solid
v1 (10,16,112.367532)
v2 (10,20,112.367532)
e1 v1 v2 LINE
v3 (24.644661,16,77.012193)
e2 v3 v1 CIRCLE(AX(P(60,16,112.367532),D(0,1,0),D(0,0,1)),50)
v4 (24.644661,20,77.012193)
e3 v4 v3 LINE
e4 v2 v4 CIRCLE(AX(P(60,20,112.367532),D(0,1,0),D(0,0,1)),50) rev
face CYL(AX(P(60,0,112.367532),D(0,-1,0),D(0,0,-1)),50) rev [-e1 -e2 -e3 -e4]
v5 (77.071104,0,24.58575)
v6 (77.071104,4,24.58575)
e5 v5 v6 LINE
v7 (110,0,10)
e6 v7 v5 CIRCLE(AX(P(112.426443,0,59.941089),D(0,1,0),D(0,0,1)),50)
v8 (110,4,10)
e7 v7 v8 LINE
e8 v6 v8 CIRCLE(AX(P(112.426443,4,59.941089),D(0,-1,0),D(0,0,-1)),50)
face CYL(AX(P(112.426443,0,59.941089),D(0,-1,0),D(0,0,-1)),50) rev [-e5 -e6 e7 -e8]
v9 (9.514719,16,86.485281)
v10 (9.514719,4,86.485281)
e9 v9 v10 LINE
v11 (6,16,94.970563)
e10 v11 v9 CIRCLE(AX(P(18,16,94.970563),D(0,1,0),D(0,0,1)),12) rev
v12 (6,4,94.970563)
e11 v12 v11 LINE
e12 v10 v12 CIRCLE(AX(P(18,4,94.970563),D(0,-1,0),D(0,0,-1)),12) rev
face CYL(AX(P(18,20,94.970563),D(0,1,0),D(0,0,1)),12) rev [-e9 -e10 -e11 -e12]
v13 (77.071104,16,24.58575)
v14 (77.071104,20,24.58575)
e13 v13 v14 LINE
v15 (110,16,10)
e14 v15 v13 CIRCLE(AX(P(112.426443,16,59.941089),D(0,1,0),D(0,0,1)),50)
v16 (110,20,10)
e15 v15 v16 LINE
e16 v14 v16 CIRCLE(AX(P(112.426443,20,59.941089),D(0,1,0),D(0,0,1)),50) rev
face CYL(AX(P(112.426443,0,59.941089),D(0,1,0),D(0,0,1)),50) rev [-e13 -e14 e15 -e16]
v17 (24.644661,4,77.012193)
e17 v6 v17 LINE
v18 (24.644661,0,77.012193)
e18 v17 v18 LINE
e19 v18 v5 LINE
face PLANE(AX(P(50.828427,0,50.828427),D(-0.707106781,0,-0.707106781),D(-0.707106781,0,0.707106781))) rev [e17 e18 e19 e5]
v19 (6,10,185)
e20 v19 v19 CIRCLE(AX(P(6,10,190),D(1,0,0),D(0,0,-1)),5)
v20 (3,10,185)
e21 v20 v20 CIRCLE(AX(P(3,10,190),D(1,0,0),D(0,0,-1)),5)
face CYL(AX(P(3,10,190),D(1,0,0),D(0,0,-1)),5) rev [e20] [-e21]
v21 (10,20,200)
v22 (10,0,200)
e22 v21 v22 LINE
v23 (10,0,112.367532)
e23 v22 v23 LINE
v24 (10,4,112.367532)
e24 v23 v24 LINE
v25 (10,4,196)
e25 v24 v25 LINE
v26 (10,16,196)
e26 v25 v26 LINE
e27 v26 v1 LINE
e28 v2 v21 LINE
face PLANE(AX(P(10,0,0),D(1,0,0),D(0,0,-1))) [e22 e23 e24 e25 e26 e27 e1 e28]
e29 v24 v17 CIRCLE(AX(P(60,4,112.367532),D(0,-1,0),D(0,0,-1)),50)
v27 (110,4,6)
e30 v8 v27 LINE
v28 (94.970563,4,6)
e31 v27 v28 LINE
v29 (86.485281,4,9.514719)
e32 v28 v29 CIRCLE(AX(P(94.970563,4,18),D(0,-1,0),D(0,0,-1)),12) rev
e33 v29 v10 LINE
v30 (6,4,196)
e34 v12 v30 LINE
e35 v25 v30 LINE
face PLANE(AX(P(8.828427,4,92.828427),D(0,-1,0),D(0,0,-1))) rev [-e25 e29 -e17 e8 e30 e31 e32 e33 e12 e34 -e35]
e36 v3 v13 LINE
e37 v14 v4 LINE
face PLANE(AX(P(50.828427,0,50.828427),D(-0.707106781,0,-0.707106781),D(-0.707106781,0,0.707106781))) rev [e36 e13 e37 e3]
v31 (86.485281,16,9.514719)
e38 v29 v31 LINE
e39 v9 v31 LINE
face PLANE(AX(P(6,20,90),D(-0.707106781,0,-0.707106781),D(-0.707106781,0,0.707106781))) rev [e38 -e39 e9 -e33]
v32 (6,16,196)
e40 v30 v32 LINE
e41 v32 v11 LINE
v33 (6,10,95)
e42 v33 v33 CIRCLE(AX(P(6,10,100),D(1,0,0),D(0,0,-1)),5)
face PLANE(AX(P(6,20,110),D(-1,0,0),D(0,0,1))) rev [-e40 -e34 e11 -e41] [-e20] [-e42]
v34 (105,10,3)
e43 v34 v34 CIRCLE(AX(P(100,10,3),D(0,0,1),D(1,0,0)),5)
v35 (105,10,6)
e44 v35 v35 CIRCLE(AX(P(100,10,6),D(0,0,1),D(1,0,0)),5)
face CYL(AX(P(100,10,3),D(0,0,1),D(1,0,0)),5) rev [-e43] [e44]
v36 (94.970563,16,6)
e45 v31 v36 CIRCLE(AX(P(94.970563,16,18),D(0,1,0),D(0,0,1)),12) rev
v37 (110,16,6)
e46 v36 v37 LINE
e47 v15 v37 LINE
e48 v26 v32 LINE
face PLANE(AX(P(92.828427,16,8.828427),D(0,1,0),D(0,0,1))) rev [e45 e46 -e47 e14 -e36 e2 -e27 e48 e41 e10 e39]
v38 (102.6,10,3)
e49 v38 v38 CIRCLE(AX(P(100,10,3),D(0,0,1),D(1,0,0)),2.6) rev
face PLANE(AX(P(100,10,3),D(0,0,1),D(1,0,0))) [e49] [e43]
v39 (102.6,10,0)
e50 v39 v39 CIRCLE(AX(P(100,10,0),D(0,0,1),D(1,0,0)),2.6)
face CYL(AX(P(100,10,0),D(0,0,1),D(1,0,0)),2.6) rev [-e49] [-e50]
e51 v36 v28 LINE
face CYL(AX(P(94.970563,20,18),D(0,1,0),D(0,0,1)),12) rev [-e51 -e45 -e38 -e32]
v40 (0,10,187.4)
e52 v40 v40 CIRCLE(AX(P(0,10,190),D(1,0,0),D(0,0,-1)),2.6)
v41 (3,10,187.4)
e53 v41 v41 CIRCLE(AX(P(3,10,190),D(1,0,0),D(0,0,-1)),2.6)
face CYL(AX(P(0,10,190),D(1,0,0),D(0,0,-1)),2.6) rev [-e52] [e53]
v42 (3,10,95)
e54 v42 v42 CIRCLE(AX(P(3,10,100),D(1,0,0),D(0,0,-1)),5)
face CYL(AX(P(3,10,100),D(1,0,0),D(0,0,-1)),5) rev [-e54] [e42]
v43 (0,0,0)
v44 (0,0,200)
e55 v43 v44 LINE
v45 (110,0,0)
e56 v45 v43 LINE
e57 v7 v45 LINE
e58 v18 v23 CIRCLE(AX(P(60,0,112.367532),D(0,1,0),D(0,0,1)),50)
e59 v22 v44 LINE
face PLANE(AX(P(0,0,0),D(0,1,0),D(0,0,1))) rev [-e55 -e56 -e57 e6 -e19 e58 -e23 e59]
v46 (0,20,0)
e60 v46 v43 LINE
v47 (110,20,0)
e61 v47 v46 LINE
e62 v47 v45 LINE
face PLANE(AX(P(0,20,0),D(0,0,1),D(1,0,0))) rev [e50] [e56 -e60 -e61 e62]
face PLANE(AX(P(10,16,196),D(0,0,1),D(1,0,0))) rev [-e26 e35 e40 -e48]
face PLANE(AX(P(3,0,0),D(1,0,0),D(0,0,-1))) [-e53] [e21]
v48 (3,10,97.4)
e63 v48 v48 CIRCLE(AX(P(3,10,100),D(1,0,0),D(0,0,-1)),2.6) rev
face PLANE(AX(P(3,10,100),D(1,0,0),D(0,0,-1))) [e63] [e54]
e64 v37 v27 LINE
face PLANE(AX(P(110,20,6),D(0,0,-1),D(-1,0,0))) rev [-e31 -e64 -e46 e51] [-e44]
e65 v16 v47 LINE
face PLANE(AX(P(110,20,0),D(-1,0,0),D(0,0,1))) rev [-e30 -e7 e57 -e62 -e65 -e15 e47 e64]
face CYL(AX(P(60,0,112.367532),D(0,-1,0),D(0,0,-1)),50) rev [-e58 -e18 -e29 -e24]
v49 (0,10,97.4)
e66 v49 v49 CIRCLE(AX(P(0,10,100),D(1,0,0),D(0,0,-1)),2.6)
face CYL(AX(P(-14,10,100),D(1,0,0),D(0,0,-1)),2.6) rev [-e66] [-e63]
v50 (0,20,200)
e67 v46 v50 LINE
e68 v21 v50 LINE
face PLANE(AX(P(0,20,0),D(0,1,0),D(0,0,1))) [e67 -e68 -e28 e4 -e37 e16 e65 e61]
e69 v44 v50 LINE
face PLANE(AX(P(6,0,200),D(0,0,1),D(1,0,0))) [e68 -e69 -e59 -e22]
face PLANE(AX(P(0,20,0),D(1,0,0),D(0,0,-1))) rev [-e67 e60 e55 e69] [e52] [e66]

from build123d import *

# Parameters (mm, degrees)
EXTRUDE_1_DEPTH     = 20
CUT_EXTRUDE_1_DEPTH = 20
SKETCH_3_R          = 5
CUT_EXTRUDE_2_DEPTH = 3
CUT_EXTRUDE_3_DEPTH = 6
SKETCH_5_R          = 5
CUT_EXTRUDE_4_DEPTH = 3
SKETCH_6_W          = 90
SKETCH_6_H          = 20
EXTRUDE_2_DEPTH     = 6
SKETCH_7_R          = 5
CUT_EXTRUDE_5_DEPTH = 3
SKETCH_8_R          = 2.6
CUT_EXTRUDE_6_DEPTH = 3
SKETCH_11_W         = 118.79393924
SKETCH_11_H         = 4
EXTRUDE_4_DEPTH     = 4
SKETCH_12_W         = 110
SKETCH_12_H         = 4
EXTRUDE_5_DEPTH     = 4
SKETCH_13_W         = 20
SKETCH_13_H         = 4
EXTRUDE_6_DEPTH     = 4
FILLET_2_R          = 12
FILLET_3_R          = 50
SKETCH_14_W         = 4
SKETCH_14_H         = 12
EXTRUDE_7_DEPTH     = 4


with BuildPart() as part:
    # 草图1 → 凸台-拉伸1 (new body)
    with BuildSketch(Plane(origin=(0, 0, 0), x_dir=(1, 0, 0), z_dir=(0, 1, 0))):
        Polygon((0, 0), (110, 0), (110, -6), (90, -6), (6, -90), (6, -110), (0, -110), align=None)
    extrude(amount=EXTRUDE_1_DEPTH)

    # 草图2 → 切除-拉伸1 (cut)
    with BuildSketch(Plane(origin=(6, 0, 0), x_dir=(0, 0, -1), z_dir=(1, 0, 0))):
        with BuildLine():
            ThreePointArc((-97.4, 10), (-99.005023076, 12.402086785), (-101.838477631, 11.838477631))
            Line((-101.838477631, 11.838477631), (-98.161522369, 8.161522369))
            ThreePointArc((-98.161522369, 8.161522369), (-97.597913215, 9.005023076), (-97.4, 10))
        make_face()
        with BuildLine():
            Line((-98.161522369, 8.161522369), (-101.838477631, 11.838477631))
            ThreePointArc((-101.838477631, 11.838477631), (-101.838477631, 8.161522369), (-98.161522369, 8.161522369))
        make_face()
    extrude(amount=-CUT_EXTRUDE_1_DEPTH, mode=Mode.SUBTRACT)

    # 草图3 → 切除-拉伸2 (cut)
    with BuildSketch(Plane(origin=(6, 0, 0), x_dir=(0, 0, -1), z_dir=(1, 0, 0))):
        with Locations((-100, 10)):
            Circle(SKETCH_3_R)
    extrude(amount=-CUT_EXTRUDE_2_DEPTH, mode=Mode.SUBTRACT)

    # 草图4 → 切除-拉伸3 (cut)
    with BuildSketch(Plane.XY.offset(6)):
        with BuildLine():
            ThreePointArc((102.6, 10), (100.994976924, 12.402086785), (98.161522369, 11.838477631))
            Line((98.161522369, 11.838477631), (101.838477631, 8.161522369))
            ThreePointArc((101.838477631, 8.161522369), (102.402086785, 9.005023076), (102.6, 10))
        make_face()
        with BuildLine():
            Line((101.838477631, 8.161522369), (98.161522369, 11.838477631))
            ThreePointArc((98.161522369, 11.838477631), (98.161522369, 8.161522369), (101.838477631, 8.161522369))
        make_face()
    extrude(amount=-CUT_EXTRUDE_3_DEPTH, mode=Mode.SUBTRACT)

    # 草图5 → 切除-拉伸4 (cut)
    with BuildSketch(Plane.XY.offset(6)):
        with Locations((100, 10)):
            Circle(SKETCH_5_R)
    extrude(amount=-CUT_EXTRUDE_4_DEPTH, mode=Mode.SUBTRACT)

    # 草图6 → 凸台-拉伸2 (add)
    with BuildSketch(Plane.ZY):
        with Locations((155, 10)):
            Rectangle(SKETCH_6_W, SKETCH_6_H)
    extrude(amount=-EXTRUDE_2_DEPTH)

    # 草图7 → 切除-拉伸5 (cut)
    with BuildSketch(Plane(origin=(6, 0, 0), x_dir=(0, 0, -1), z_dir=(1, 0, 0))):
        with Locations((-190, 10)):
            Circle(SKETCH_7_R)
    extrude(amount=-CUT_EXTRUDE_5_DEPTH, mode=Mode.SUBTRACT)

    # 草图8 → 切除-拉伸6 (cut)
    with BuildSketch(Plane(origin=(3, 0, 0), x_dir=(0, 0, -1), z_dir=(1, 0, 0))):
        with Locations((-190, 10)):
            Circle(SKETCH_8_R)
    extrude(amount=-CUT_EXTRUDE_6_DEPTH, mode=Mode.SUBTRACT)

    # 草图11 → 凸台-拉伸4 (add)
    with BuildSketch(Plane(origin=(48, 0, 48), x_dir=(0.7071067811865475, 0, -0.7071067811865476), z_dir=(0.7071067811865476, 0, 0.7071067811865475))):
        with Locations((0, 18)):
            Rectangle(SKETCH_11_W, SKETCH_11_H)
        with Locations((0, 2)):
            Rectangle(SKETCH_11_W, SKETCH_11_H)
    extrude(amount=EXTRUDE_4_DEPTH)

    # 草图12 → 凸台-拉伸5 (add)
    with BuildSketch(Plane(origin=(6, 0, 0), x_dir=(0, 0, -1), z_dir=(1, 0, 0))):
        with Locations((-145, 18)):
            Rectangle(SKETCH_12_W, SKETCH_12_H)
        with Locations((-145, 2)):
            Rectangle(SKETCH_12_W, SKETCH_12_H)
    extrude(amount=EXTRUDE_5_DEPTH)

    # 草图13 → 凸台-拉伸6 (add)
    with BuildSketch(Plane.XY.offset(6)):
        with Locations((100, 18)):
            Rectangle(SKETCH_13_W, SKETCH_13_H)
        with Locations((100, 2)):
            Rectangle(SKETCH_13_W, SKETCH_13_H)
    extrude(amount=EXTRUDE_6_DEPTH)

    # 圆角2
    fillet_2_edges = [part.edges().sort_by_distance(p)[0] for p in [
        (90, 10, 6),
        (6, 10, 90),
    ]]
    fillet(fillet_2_edges, radius=FILLET_2_R)

    # 圆角3
    # the kernel refuses this fillet: 50 mm, written as the material it adds along each edge
    with BuildSketch(Plane(origin=(10, 0, 91.656854249), x_dir=(0, 0, 1), z_dir=(0, 1, 0))) as fillet_3_piece_1:
        with BuildLine():
            CenterArc((FILLET_3_R * 0.414213562373, FILLET_3_R), FILLET_3_R, 225, 45)
            Line((-FILLET_3_R * 0.292893218813, FILLET_3_R * 0.292893218813), (-FILLET_3_R * 0.307035354437, FILLET_3_R * 0.27875108319))
            Line((-FILLET_3_R * 0.307035354437, FILLET_3_R * 0.27875108319), (-FILLET_3_R * 0.00828427124746, -FILLET_3_R * 0.02))
            Line((-FILLET_3_R * 0.00828427124746, -FILLET_3_R * 0.02), (FILLET_3_R * 0.414213562373, -FILLET_3_R * 0.02))
            Line((FILLET_3_R * 0.414213562373, -FILLET_3_R * 0.02), (FILLET_3_R * 0.414213562373, 0))
        make_face()
    extrude(amount=4)
    with BuildSketch(Plane(origin=(10, 0, 91.656854249), x_dir=(0, 0, 1), z_dir=(0, 1, 0))) as fillet_3_piece_2_section:
        with BuildLine():
            CenterArc((FILLET_3_R * 0.414213562373, FILLET_3_R), FILLET_3_R, 225, 45)
            Line((-FILLET_3_R * 0.292893218813, FILLET_3_R * 0.292893218813), (-FILLET_3_R * 0.307035354437, FILLET_3_R * 0.27875108319))
            Line((-FILLET_3_R * 0.307035354437, FILLET_3_R * 0.27875108319), (-FILLET_3_R * 0.00828427124746, -FILLET_3_R * 0.02))
            Line((-FILLET_3_R * 0.00828427124746, -FILLET_3_R * 0.02), (FILLET_3_R * 0.414213562373, -FILLET_3_R * 0.02))
            Line((FILLET_3_R * 0.414213562373, -FILLET_3_R * 0.02), (FILLET_3_R * 0.414213562373, 0))
        make_face()
    fillet_3_piece_2 = extrude(amount=55.776695297, mode=Mode.PRIVATE)
    fillet_3_piece_2 = split(fillet_3_piece_2, bisect_by=Plane(origin=(13.090507107, 16, 92.936984208), z_dir=(0, 1, 0)), keep=Keep.TOP, mode=Mode.PRIVATE)
    fillet_3_piece_2 = split(fillet_3_piece_2, bisect_by=Plane(origin=(13.090507107, 20, 92.936984208), z_dir=(0, -1, 0)), keep=Keep.TOP, mode=Mode.PRIVATE)
    add(fillet_3_piece_2)
    with BuildSketch(Plane(origin=(10, 20, 91.656854249), x_dir=(0, 0, 1), z_dir=(0, -1, 0))) as fillet_3_piece_3:
        with BuildLine():
            CenterArc((FILLET_3_R * 0.414213562373, -FILLET_3_R), FILLET_3_R, 90, 45)
            Line((-FILLET_3_R * 0.292893218813, -FILLET_3_R * 0.292893218813), (-FILLET_3_R * 0.307035354437, -FILLET_3_R * 0.27875108319))
            Line((-FILLET_3_R * 0.307035354437, -FILLET_3_R * 0.27875108319), (-FILLET_3_R * 0.00828427124746, FILLET_3_R * 0.02))
            Line((-FILLET_3_R * 0.00828427124746, FILLET_3_R * 0.02), (FILLET_3_R * 0.414213562373, FILLET_3_R * 0.02))
            Line((FILLET_3_R * 0.414213562373, FILLET_3_R * 0.02), (FILLET_3_R * 0.414213562373, 0))
        make_face()
    extrude(amount=4)
    with BuildSketch(Plane(origin=(10, 20, 91.656854249), x_dir=(0, 0, 1), z_dir=(0, -1, 0))) as fillet_3_piece_4_section:
        with BuildLine():
            CenterArc((FILLET_3_R * 0.414213562373, -FILLET_3_R), FILLET_3_R, 90, 45)
            Line((-FILLET_3_R * 0.292893218813, -FILLET_3_R * 0.292893218813), (-FILLET_3_R * 0.307035354437, -FILLET_3_R * 0.27875108319))
            Line((-FILLET_3_R * 0.307035354437, -FILLET_3_R * 0.27875108319), (-FILLET_3_R * 0.00828427124746, FILLET_3_R * 0.02))
            Line((-FILLET_3_R * 0.00828427124746, FILLET_3_R * 0.02), (FILLET_3_R * 0.414213562373, FILLET_3_R * 0.02))
            Line((FILLET_3_R * 0.414213562373, FILLET_3_R * 0.02), (FILLET_3_R * 0.414213562373, 0))
        make_face()
    fillet_3_piece_4 = extrude(amount=55.776695297, mode=Mode.PRIVATE)
    fillet_3_piece_4 = split(fillet_3_piece_4, bisect_by=Plane(origin=(13.090507107, 4, 92.936984208), z_dir=(0, -1, 0)), keep=Keep.TOP, mode=Mode.PRIVATE)
    fillet_3_piece_4 = split(fillet_3_piece_4, bisect_by=Plane(origin=(13.090507107, 0, 92.936984208), z_dir=(0, 1, 0)), keep=Keep.TOP, mode=Mode.PRIVATE)
    add(fillet_3_piece_4)
    with BuildSketch(Plane(origin=(91.656854249, 0, 10), x_dir=(1, 0, 0), z_dir=(0, 1, 0))) as fillet_3_piece_5:
        with BuildLine():
            CenterArc((20.769589097, -49.941089022), FILLET_3_R, 92.781591787, 42.218408213)
            Line((-14.585749963, -14.585749963), (-15.292856744, -13.878643181))
            Line((-15.292856744, -13.878643181), (-0.707106781, 0.707106781))
            Line((-0.707106781, 0.707106781), (0, 1))
            ThreePointArc((0, 1), (9.171572875, 1), (18.294616884, 0.99882178))
            Line((18.294616884, 0.99882178), (18.343145751, 0))
        make_face()
    extrude(amount=4)
    with BuildSketch(Plane(origin=(91.656854249, 0, 10), x_dir=(1, 0, 0), z_dir=(0, 1, 0))) as fillet_3_piece_6_section:
        with BuildLine():
            CenterArc((20.769589097, -49.941089022), FILLET_3_R, 92.781591787, 42.218408213)
            Line((-14.585749963, -14.585749963), (-15.292856744, -13.878643181))
            Line((-15.292856744, -13.878643181), (-0.707106781, 0.707106781))
            Line((-0.707106781, 0.707106781), (0, 1))
            ThreePointArc((0, 1), (9.171572875, 1), (18.294616884, 0.99882178))
            Line((18.294616884, 0.99882178), (18.343145751, 0))
        make_face()
    fillet_3_piece_6 = extrude(amount=55.568413536, mode=Mode.PRIVATE)
    fillet_3_piece_6 = split(fillet_3_piece_6, bisect_by=Plane(origin=(92.410386276, 16, 13.180383565), z_dir=(0, 1, 0)), keep=Keep.TOP, mode=Mode.PRIVATE)
    fillet_3_piece_6 = split(fillet_3_piece_6, bisect_by=Plane(origin=(92.410386276, 20, 13.180383565), z_dir=(0, -1, 0)), keep=Keep.TOP, mode=Mode.PRIVATE)
    add(fillet_3_piece_6)
    with BuildSketch(Plane(origin=(91.656854249, 20, 10), x_dir=(1, 0, 0), z_dir=(0, -1, 0))) as fillet_3_piece_7:
        with BuildLine():
            CenterArc((20.769589097, 49.941089022), FILLET_3_R, 225, 42.218408213)
            Line((-14.585749963, 14.585749963), (-15.292856744, 13.878643181))
            Line((-15.292856744, 13.878643181), (-0.707106781, -0.707106781))
            Line((-0.707106781, -0.707106781), (0, -1))
            ThreePointArc((0, -1), (9.171572875, -1), (18.294616884, -0.99882178))
            Line((18.294616884, -0.99882178), (18.343145751, 0))
        make_face()
    extrude(amount=4)
    with BuildSketch(Plane(origin=(91.656854249, 20, 10), x_dir=(1, 0, 0), z_dir=(0, -1, 0))) as fillet_3_piece_8_section:
        with BuildLine():
            CenterArc((20.769589097, 49.941089022), FILLET_3_R, 225, 42.218408213)
            Line((-14.585749963, 14.585749963), (-15.292856744, 13.878643181))
            Line((-15.292856744, 13.878643181), (-0.707106781, -0.707106781))
            Line((-0.707106781, -0.707106781), (0, -1))
            ThreePointArc((0, -1), (9.171572875, -1), (18.294616884, -0.99882178))
            Line((18.294616884, -0.99882178), (18.343145751, 0))
        make_face()
    fillet_3_piece_8 = extrude(amount=55.568413536, mode=Mode.PRIVATE)
    fillet_3_piece_8 = split(fillet_3_piece_8, bisect_by=Plane(origin=(92.410386276, 4, 13.180383565), z_dir=(0, -1, 0)), keep=Keep.TOP, mode=Mode.PRIVATE)
    fillet_3_piece_8 = split(fillet_3_piece_8, bisect_by=Plane(origin=(92.410386276, 0, 13.180383565), z_dir=(0, 1, 0)), keep=Keep.TOP, mode=Mode.PRIVATE)
    add(fillet_3_piece_8)

    # 草图14 → 凸台-拉伸7 (add)
    with BuildSketch(Plane(origin=(6, 0, 0), x_dir=(0, 0, -1), z_dir=(1, 0, 0))):
        with Locations((-198, 10)):
            Rectangle(SKETCH_14_W, SKETCH_14_H)
    extrude(amount=EXTRUDE_7_DEPTH)


solid = part.part
